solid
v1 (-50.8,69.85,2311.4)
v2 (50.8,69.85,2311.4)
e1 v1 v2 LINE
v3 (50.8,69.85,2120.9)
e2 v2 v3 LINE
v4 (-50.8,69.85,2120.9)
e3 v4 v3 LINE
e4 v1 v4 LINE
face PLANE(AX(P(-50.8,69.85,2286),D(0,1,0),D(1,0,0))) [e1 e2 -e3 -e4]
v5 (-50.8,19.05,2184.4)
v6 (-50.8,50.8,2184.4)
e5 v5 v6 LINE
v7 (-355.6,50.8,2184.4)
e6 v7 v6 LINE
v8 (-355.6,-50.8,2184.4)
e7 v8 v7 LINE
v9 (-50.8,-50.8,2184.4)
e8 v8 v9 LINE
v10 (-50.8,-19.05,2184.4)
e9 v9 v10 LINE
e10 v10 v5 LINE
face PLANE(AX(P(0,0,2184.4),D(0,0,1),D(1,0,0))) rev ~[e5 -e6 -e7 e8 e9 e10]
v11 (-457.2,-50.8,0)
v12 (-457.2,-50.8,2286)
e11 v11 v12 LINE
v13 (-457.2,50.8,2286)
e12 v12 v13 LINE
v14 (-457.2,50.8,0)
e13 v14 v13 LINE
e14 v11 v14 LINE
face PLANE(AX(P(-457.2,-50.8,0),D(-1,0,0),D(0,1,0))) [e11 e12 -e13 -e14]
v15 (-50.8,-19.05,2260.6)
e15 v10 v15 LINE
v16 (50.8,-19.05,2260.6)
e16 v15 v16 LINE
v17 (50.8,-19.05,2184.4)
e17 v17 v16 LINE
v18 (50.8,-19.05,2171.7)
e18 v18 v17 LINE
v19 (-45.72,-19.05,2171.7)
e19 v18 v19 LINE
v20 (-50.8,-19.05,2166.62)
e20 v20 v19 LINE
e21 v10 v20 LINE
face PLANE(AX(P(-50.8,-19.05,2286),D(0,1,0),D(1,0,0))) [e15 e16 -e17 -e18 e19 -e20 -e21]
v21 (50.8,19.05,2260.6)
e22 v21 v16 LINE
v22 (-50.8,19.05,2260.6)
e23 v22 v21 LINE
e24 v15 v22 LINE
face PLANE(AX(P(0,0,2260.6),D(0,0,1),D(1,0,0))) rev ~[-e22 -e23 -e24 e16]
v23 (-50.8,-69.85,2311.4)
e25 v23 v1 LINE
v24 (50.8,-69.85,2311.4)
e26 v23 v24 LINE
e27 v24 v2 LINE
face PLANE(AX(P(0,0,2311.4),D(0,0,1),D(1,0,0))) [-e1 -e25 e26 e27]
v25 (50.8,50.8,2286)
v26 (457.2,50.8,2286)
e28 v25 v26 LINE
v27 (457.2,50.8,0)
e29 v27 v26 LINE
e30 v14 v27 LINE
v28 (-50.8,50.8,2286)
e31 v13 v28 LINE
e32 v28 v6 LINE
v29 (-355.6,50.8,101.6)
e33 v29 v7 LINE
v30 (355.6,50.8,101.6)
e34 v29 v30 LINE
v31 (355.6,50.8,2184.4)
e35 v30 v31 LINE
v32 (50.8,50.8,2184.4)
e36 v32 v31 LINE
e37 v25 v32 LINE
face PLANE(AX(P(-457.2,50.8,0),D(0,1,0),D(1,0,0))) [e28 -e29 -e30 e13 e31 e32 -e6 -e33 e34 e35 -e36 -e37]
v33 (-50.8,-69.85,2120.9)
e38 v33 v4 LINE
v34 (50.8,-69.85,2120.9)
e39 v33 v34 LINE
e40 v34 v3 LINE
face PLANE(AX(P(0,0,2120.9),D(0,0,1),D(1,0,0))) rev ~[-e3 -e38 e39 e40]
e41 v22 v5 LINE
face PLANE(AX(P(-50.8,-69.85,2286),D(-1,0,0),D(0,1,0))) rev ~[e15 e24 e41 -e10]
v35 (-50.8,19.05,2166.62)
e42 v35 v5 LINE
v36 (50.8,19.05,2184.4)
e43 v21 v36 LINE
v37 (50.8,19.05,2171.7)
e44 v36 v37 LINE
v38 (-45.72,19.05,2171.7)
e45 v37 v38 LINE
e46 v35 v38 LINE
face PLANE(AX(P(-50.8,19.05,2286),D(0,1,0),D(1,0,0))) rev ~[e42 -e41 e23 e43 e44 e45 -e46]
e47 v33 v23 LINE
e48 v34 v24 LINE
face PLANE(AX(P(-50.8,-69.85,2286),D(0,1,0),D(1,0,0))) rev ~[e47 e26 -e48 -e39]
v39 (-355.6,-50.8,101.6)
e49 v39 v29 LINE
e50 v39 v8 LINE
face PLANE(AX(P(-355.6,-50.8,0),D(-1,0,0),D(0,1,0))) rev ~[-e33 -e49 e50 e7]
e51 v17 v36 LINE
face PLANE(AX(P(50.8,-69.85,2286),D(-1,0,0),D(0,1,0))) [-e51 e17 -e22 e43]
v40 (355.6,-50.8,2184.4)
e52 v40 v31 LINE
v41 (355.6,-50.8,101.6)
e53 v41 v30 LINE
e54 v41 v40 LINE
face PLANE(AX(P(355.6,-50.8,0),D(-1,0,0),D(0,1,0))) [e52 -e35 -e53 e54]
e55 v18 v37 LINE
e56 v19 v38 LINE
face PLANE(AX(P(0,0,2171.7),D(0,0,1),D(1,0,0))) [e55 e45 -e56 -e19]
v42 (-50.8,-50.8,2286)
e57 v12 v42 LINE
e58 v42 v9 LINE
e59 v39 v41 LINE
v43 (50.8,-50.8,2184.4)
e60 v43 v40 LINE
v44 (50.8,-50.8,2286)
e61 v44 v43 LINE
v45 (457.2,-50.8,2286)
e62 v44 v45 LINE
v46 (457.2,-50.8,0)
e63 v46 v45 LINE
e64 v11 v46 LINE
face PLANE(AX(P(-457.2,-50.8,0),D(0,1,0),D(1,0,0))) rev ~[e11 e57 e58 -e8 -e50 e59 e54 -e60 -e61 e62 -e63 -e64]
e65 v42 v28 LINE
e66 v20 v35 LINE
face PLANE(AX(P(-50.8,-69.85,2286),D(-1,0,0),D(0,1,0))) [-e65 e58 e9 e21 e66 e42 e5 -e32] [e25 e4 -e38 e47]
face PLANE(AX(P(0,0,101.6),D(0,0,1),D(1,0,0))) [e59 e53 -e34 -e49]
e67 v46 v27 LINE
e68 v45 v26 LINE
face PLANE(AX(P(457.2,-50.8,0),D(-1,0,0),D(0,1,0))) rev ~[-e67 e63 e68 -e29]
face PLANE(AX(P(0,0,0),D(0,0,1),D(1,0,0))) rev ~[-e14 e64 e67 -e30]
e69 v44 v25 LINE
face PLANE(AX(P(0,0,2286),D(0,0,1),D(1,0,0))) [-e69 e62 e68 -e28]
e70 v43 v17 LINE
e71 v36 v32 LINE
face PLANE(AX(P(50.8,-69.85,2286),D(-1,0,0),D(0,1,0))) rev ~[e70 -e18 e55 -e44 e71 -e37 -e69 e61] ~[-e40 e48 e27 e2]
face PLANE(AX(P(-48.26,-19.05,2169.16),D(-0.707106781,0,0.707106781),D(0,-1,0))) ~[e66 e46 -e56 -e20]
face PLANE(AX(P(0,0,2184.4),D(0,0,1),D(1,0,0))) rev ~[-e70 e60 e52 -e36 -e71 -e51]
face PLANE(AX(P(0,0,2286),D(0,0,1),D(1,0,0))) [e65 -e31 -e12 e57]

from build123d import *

# Parameters (mm, degrees)
F0_W          = 914.4
F0_H          = 101.6
F1_DEPTH      = 2286
F2_T          = -101.6
F3_W          = 101.6
F3_H          = 139.7
F4_DEPTH      = 165.1
F4_DEPTH_BACK = 25.4
F5_T          = 50.8
F5_T3_DEPTH   = 203.2
F6_SIZE       = 5.08


# Not quite as in the source:
# - a shell that OpenCascade refuses in one call is made with other operations: the cavity is built on its own and cut out


with BuildPart() as f1:
    # F0 (on Top) → F1 (new body)
    with BuildSketch(Plane.XY):
        Rectangle(F0_W, F0_H)
    extrude(amount=F1_DEPTH)

    # F2
    f2_openings = [f1.faces().sort_by_distance(p)[0] for p in [
        (0, -50.8, 1143),
        (0, 50.8, 1143),
    ]]
    offset(amount=F2_T, openings=f2_openings)

    # F3 (on face) → F4 (join, two sides)
    with BuildSketch(Plane.XY.offset(2286)) as f4_sk:
        Rectangle(F3_W, F3_H)
    extrude(amount=-F4_DEPTH)
    extrude(f4_sk.sketch, amount=F4_DEPTH_BACK)

    # F5: shell of thickness 50.8, made by hand


with BuildPart() as f5_core1:
    # F5_t2: copy of F1
    add(f1.part)

    # the walls: a layer under each face that stays
    f5_faces = [f5_core1.faces().sort_by_distance(p)[0] for p in [
        (-457.2, 0, 1143),
        (391.8857142857, 50.8, 2122.7142857143),
        (-391.8857142857, -50.8, 2122.7142857143),
        (0, 0, 0),
        (-254, 0, 2286),
        (-203.2, 0, 2184.4),
        (-355.6, 0, 1143),
        (0, 0, 101.6),
        (355.6, 0, 1143),
        (203.2, 0, 2184.4),
        (254, 0, 2286),
        (457.2, 0, 1143),
        (0, 0, 2120.9),
        (0, 69.85, 2216.15),
        (0, -69.85, 2216.15),
        (0, 0, 2311.4),
    ]]
    thicken(f5_faces, amount=-F5_T, mode=Mode.SUBTRACT)

    # F5_s4 → F5_t3 (cut)
    with BuildSketch(Plane.XZ.offset(-101.6)):
        Polygon((-355.092, 2183.892), (-355.6, 2235.2), (-406.4, 2235.2), (-406.4, 2184.4), align=None)
        Polygon((-355.092, 102.108), (-406.4, 101.6), (-406.4, 50.8), (-355.6, 50.8), align=None)
        Polygon((355.092, 102.108), (355.6, 50.8), (406.4, 50.8), (406.4, 101.6), align=None)
        Polygon((355.092, 2183.892), (406.4, 2184.4), (406.4, 2235.2), (355.6, 2235.2), align=None)
    extrude(amount=F5_T3_DEPTH, mode=Mode.SUBTRACT)


with BuildPart() as f1_1:
    add(f1.part)

    # what is left inside the walls is the cavity
    f5_cavity = [f5_core1.part.solids().sort_by_distance(p)[0] for p in [
        (0, -18.542, 2201.333333),
    ]]
    add(f5_cavity, mode=Mode.SUBTRACT)

    # F6
    f6_edges = [f1_1.edges().sort_by_distance(p)[0] for p in [
        (-50.8, 0, 2171.7),
    ]]
    chamfer(f6_edges, length=F6_SIZE)


solid = f1_1.part
